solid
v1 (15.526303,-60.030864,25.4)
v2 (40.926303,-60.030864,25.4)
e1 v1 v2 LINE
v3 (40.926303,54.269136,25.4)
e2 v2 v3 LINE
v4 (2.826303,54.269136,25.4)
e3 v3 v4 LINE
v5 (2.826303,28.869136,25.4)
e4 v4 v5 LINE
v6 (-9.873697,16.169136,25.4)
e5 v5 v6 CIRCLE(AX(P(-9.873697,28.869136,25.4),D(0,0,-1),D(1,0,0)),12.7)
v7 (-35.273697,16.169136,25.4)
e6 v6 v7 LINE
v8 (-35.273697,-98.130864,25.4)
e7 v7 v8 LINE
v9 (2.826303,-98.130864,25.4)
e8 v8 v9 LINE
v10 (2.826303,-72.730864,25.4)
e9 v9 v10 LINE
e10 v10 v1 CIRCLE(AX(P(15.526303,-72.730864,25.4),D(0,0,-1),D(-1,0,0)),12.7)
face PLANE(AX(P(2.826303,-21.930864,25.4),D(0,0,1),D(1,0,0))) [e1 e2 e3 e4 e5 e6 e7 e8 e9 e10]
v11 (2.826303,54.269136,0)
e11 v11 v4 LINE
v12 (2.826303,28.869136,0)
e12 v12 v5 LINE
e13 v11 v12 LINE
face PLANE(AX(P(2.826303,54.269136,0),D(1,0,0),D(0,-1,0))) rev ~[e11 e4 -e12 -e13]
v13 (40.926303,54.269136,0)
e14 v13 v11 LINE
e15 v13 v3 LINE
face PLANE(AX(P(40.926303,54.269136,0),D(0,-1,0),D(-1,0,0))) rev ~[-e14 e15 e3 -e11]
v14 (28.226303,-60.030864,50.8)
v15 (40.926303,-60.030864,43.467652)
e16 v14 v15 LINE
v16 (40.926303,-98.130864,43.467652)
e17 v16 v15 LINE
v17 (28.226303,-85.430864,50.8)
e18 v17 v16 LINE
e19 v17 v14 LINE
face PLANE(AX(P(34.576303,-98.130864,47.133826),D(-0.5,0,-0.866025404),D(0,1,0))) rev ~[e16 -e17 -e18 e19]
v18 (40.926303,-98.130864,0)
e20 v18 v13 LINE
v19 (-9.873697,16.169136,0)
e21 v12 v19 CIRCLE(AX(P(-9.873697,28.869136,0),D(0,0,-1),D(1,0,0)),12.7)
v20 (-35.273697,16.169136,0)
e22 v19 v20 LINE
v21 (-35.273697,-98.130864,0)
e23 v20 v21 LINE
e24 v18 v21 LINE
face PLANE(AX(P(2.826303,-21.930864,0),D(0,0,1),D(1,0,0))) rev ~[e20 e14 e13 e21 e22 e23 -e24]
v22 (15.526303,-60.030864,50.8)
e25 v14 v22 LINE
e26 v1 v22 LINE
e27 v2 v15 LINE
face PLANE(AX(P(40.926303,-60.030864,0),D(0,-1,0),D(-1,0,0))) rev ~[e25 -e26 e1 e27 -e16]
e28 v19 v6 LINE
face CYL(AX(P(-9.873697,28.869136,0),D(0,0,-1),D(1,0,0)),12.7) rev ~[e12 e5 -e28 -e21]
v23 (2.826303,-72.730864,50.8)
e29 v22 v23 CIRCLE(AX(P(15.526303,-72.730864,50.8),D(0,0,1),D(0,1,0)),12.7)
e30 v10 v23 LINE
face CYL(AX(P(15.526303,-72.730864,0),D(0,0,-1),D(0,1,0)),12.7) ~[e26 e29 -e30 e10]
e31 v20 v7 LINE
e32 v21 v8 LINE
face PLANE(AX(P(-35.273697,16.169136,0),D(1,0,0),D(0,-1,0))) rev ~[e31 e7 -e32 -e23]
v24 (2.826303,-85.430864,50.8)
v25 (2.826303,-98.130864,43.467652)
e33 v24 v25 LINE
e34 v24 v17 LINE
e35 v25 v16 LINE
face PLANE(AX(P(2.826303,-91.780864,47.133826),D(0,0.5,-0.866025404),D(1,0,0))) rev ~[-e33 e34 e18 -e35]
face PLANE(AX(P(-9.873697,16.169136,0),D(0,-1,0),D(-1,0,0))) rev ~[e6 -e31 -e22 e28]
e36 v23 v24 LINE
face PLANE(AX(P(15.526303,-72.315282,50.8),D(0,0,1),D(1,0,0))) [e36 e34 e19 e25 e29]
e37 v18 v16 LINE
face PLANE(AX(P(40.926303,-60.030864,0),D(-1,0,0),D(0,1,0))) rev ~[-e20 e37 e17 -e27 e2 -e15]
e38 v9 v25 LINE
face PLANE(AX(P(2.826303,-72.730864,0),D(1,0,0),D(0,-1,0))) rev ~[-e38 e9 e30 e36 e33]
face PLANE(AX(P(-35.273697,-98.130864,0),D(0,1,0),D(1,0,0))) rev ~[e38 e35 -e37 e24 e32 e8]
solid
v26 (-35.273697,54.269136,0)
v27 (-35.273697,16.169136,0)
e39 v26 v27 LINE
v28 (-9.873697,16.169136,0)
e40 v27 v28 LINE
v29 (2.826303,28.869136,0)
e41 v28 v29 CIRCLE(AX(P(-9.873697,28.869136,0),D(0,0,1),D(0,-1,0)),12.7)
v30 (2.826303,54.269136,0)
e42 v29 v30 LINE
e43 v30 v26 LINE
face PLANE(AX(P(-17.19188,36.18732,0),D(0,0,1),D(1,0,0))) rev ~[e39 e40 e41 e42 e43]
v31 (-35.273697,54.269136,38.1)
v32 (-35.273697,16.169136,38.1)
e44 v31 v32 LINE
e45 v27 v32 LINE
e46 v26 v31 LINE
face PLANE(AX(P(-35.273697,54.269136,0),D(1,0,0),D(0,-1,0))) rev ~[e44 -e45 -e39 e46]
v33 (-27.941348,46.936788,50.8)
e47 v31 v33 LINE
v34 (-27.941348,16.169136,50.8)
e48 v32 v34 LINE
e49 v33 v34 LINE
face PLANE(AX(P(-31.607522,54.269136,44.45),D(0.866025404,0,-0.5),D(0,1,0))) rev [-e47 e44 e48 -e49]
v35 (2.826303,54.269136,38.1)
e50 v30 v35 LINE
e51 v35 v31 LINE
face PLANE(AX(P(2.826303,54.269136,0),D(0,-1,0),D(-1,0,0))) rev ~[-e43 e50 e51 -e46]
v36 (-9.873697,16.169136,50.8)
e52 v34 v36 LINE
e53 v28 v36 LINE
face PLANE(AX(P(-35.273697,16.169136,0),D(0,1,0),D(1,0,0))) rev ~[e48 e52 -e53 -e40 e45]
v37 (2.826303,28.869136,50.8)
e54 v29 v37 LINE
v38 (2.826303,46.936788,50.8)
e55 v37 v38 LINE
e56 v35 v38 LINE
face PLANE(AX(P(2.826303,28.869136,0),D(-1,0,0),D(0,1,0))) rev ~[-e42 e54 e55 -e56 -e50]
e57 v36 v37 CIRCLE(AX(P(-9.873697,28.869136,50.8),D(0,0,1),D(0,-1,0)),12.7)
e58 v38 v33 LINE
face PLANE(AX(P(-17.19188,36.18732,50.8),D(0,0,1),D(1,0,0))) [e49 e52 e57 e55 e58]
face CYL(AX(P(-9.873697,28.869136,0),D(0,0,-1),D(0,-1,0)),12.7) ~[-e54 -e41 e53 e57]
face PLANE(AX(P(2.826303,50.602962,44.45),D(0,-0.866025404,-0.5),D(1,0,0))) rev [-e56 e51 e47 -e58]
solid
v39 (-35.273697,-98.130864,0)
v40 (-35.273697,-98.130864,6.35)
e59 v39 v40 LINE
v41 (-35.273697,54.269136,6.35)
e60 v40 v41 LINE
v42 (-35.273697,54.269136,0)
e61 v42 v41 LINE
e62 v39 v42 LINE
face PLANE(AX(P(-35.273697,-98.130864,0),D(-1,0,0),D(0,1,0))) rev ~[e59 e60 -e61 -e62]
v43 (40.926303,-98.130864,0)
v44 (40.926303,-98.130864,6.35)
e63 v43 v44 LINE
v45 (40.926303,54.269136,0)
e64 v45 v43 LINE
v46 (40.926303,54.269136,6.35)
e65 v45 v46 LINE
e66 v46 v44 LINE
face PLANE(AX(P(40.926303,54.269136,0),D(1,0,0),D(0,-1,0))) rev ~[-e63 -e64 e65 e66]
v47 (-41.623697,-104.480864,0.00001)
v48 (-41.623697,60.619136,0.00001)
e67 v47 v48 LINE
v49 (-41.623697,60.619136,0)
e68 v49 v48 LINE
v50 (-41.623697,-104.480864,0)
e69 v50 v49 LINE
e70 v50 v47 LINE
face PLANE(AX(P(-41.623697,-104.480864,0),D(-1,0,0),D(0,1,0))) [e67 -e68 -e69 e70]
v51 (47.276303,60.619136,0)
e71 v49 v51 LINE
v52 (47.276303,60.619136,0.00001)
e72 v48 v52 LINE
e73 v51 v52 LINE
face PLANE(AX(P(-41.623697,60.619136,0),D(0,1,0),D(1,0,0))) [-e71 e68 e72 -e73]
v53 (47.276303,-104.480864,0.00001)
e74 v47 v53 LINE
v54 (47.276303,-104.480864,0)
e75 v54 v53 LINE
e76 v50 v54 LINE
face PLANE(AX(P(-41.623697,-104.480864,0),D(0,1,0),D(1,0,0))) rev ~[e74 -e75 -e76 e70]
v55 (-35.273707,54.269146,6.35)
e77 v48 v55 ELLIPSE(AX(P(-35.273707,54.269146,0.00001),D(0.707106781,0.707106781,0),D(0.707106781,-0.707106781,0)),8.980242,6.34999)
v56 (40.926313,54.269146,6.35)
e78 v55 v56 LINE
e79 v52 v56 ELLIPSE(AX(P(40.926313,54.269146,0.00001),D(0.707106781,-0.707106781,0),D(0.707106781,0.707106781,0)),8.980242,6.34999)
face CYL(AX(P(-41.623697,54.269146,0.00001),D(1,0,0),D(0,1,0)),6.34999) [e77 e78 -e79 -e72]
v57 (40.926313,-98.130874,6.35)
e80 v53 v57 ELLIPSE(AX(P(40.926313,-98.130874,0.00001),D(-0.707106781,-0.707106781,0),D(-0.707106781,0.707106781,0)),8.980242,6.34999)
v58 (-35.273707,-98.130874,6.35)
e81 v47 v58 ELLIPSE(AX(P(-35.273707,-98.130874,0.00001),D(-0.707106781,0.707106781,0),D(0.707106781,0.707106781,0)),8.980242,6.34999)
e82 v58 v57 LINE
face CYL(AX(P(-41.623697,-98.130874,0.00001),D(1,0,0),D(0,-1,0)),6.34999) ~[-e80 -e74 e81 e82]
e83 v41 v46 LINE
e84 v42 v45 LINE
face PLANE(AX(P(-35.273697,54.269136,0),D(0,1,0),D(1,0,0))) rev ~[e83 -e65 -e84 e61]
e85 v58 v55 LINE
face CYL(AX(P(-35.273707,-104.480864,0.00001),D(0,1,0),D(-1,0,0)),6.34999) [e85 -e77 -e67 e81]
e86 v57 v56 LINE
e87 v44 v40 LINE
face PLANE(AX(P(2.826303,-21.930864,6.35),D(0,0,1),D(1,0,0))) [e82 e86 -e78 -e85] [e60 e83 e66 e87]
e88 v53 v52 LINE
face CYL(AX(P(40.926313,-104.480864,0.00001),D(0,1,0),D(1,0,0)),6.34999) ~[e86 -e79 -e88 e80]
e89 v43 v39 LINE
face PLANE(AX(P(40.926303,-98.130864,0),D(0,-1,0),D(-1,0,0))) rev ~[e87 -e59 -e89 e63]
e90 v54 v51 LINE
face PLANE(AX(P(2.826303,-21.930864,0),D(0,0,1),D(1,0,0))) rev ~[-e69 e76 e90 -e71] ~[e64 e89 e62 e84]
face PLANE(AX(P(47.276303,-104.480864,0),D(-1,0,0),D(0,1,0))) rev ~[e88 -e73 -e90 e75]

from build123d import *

# Parameters (mm, degrees)
F1_DEPTH = 50.8
F2_DEPTH = 25.4
F0_W     = 88.9
F0_H     = 165.1
F3_DEPTH = 6.35
F4_SIZE2 = 7.3323484187
F4_SIZE  = 12.7
F5_SIZE2 = 7.3323484187
F5_SIZE  = 12.7
F6_R     = 6.34999


# Not quite as in the source:
# - a fillet or chamfer is up to 0.001 mm smaller than in the source, because OpenCascade refuses the exact size


with BuildPart() as f1:
    # F0 (on Top) → F1 (new body)
    with BuildSketch(Plane.XY):
        with BuildLine():
            Line((2.826303332, 54.2691361523), (-35.273696668, 54.2691361523))
            Line((-35.273696668, 54.2691361523), (-35.273696668, 16.1691361523))
            Line((-35.273696668, 16.1691361523), (-9.873696668, 16.1691361523))
            ThreePointArc((-9.873696668, 16.1691361523), (-18.853952789, 37.8493922734), (2.826303332, 28.8691361523))
            Line((2.826303332, 28.8691361523), (2.826303332, 54.2691361523))
        make_face()
        with BuildLine():
            ThreePointArc((-9.873696668, 16.1691361523), (-0.8934405469, 19.8888800313), (2.826303332, 28.8691361523))
            ThreePointArc((2.826303332, 28.8691361523), (-18.853952789, 37.8493922734), (-9.873696668, 16.1691361523))
        make_face()
    extrude(amount=F1_DEPTH)

    # F5
    f5_edges = [f1.edges().sort_by_distance(p)[0] for p in [
        (-16.223697, 54.269136, 50.8),
        (-35.273697, 35.219136, 50.8),
    ]]
    chamfer(f5_edges, length=F5_SIZE, length2=F5_SIZE2)


with BuildPart() as f1b:
    # F0 (on Top) → F1, piece 2 (new body)
    with BuildSketch(Plane.XY):
        with BuildLine():
            ThreePointArc((28.226303332, -72.7308638477), (24.5065594531, -63.7506077266), (15.526303332, -60.0308638477))
            ThreePointArc((15.526303332, -60.0308638477), (6.546047211, -63.7506077266), (2.826303332, -72.7308638477))
            ThreePointArc((2.826303332, -72.7308638477), (15.526303332, -85.4308638477), (28.226303332, -72.7308638477))
        make_face()
        with BuildLine():
            Line((40.926303332, -98.1308638477), (40.926303332, -60.0308638477))
            Line((40.926303332, -60.0308638477), (15.526303332, -60.0308638477))
            ThreePointArc((15.526303332, -60.0308638477), (24.5065594531, -63.7506077266), (28.226303332, -72.7308638477))
            ThreePointArc((28.226303332, -72.7308638477), (15.526303332, -85.4308638477), (2.826303332, -72.7308638477))
            Line((2.826303332, -72.7308638477), (2.826303332, -98.1308638477))
            Line((2.826303332, -98.1308638477), (40.926303332, -98.1308638477))
        make_face()
    extrude(amount=F1_DEPTH)

    # F0 (on Top) → F2 (join)
    with BuildSketch(Plane.XY):
        with BuildLine():
            Line((40.926303332, 54.2691361523), (2.826303332, 54.2691361523))
            Line((2.826303332, 54.2691361523), (2.826303332, 28.8691361523))
            ThreePointArc((2.826303332, 28.8691361523), (-0.8934405469, 19.8888800313), (-9.873696668, 16.1691361523))
            Line((-9.873696668, 16.1691361523), (-35.273696668, 16.1691361523))
            Line((-35.273696668, 16.1691361523), (-35.273696668, -98.1308638477))
            Line((-35.273696668, -98.1308638477), (2.826303332, -98.1308638477))
            Line((2.826303332, -98.1308638477), (2.826303332, -72.7308638477))
            ThreePointArc((2.826303332, -72.7308638477), (6.546047211, -63.7506077266), (15.526303332, -60.0308638477))
            Line((15.526303332, -60.0308638477), (40.926303332, -60.0308638477))
            Line((40.926303332, -60.0308638477), (40.926303332, 54.2691361523))
        make_face()
    extrude(amount=F2_DEPTH)

    # F4
    f4_edges = [f1b.edges().sort_by_distance(p)[0] for p in [
        (21.876303, -98.130864, 50.8),
        (40.926303, -79.080864, 50.8),
    ]]
    f4_side = f1b.faces().sort_by_distance((22.272346, -79.476906, 50.8))[0]
    chamfer(f4_edges, length=F4_SIZE, length2=F4_SIZE2, reference=f4_side)


with BuildPart() as f3:
    # F0 (on Top) → F3 (new body)
    with BuildSketch(Plane.XY):
        with Locations((2.826303332, -21.9308638477)):
            Rectangle(F0_W, F0_H)
        Polygon((-35.273696668, 16.1691361523), (-35.273696668, 54.2691361523), (2.826303332, 54.2691361523), (40.926303332, 54.2691361523), (40.926303332, -60.0308638477), (40.926303332, -98.1308638477), (2.826303332, -98.1308638477), (-35.273696668, -98.1308638477), align=None, mode=Mode.SUBTRACT)
    extrude(amount=F3_DEPTH)

    # F6 (radius 6.35 in the source; OpenCascade refuses exactly that, so slightly less here)
    f6_edges = [f3.edges().sort_by_distance(p)[0] for p in [
        (47.276303, -21.930864, 6.35),
        (2.826303, 60.619136, 6.35),
        (-41.623697, -21.930864, 6.35),
        (2.826303, -104.480864, 6.35),
    ]]
    fillet(f6_edges, radius=F6_R)


solid = Compound([f1.part, f1b.part, f3.part])
